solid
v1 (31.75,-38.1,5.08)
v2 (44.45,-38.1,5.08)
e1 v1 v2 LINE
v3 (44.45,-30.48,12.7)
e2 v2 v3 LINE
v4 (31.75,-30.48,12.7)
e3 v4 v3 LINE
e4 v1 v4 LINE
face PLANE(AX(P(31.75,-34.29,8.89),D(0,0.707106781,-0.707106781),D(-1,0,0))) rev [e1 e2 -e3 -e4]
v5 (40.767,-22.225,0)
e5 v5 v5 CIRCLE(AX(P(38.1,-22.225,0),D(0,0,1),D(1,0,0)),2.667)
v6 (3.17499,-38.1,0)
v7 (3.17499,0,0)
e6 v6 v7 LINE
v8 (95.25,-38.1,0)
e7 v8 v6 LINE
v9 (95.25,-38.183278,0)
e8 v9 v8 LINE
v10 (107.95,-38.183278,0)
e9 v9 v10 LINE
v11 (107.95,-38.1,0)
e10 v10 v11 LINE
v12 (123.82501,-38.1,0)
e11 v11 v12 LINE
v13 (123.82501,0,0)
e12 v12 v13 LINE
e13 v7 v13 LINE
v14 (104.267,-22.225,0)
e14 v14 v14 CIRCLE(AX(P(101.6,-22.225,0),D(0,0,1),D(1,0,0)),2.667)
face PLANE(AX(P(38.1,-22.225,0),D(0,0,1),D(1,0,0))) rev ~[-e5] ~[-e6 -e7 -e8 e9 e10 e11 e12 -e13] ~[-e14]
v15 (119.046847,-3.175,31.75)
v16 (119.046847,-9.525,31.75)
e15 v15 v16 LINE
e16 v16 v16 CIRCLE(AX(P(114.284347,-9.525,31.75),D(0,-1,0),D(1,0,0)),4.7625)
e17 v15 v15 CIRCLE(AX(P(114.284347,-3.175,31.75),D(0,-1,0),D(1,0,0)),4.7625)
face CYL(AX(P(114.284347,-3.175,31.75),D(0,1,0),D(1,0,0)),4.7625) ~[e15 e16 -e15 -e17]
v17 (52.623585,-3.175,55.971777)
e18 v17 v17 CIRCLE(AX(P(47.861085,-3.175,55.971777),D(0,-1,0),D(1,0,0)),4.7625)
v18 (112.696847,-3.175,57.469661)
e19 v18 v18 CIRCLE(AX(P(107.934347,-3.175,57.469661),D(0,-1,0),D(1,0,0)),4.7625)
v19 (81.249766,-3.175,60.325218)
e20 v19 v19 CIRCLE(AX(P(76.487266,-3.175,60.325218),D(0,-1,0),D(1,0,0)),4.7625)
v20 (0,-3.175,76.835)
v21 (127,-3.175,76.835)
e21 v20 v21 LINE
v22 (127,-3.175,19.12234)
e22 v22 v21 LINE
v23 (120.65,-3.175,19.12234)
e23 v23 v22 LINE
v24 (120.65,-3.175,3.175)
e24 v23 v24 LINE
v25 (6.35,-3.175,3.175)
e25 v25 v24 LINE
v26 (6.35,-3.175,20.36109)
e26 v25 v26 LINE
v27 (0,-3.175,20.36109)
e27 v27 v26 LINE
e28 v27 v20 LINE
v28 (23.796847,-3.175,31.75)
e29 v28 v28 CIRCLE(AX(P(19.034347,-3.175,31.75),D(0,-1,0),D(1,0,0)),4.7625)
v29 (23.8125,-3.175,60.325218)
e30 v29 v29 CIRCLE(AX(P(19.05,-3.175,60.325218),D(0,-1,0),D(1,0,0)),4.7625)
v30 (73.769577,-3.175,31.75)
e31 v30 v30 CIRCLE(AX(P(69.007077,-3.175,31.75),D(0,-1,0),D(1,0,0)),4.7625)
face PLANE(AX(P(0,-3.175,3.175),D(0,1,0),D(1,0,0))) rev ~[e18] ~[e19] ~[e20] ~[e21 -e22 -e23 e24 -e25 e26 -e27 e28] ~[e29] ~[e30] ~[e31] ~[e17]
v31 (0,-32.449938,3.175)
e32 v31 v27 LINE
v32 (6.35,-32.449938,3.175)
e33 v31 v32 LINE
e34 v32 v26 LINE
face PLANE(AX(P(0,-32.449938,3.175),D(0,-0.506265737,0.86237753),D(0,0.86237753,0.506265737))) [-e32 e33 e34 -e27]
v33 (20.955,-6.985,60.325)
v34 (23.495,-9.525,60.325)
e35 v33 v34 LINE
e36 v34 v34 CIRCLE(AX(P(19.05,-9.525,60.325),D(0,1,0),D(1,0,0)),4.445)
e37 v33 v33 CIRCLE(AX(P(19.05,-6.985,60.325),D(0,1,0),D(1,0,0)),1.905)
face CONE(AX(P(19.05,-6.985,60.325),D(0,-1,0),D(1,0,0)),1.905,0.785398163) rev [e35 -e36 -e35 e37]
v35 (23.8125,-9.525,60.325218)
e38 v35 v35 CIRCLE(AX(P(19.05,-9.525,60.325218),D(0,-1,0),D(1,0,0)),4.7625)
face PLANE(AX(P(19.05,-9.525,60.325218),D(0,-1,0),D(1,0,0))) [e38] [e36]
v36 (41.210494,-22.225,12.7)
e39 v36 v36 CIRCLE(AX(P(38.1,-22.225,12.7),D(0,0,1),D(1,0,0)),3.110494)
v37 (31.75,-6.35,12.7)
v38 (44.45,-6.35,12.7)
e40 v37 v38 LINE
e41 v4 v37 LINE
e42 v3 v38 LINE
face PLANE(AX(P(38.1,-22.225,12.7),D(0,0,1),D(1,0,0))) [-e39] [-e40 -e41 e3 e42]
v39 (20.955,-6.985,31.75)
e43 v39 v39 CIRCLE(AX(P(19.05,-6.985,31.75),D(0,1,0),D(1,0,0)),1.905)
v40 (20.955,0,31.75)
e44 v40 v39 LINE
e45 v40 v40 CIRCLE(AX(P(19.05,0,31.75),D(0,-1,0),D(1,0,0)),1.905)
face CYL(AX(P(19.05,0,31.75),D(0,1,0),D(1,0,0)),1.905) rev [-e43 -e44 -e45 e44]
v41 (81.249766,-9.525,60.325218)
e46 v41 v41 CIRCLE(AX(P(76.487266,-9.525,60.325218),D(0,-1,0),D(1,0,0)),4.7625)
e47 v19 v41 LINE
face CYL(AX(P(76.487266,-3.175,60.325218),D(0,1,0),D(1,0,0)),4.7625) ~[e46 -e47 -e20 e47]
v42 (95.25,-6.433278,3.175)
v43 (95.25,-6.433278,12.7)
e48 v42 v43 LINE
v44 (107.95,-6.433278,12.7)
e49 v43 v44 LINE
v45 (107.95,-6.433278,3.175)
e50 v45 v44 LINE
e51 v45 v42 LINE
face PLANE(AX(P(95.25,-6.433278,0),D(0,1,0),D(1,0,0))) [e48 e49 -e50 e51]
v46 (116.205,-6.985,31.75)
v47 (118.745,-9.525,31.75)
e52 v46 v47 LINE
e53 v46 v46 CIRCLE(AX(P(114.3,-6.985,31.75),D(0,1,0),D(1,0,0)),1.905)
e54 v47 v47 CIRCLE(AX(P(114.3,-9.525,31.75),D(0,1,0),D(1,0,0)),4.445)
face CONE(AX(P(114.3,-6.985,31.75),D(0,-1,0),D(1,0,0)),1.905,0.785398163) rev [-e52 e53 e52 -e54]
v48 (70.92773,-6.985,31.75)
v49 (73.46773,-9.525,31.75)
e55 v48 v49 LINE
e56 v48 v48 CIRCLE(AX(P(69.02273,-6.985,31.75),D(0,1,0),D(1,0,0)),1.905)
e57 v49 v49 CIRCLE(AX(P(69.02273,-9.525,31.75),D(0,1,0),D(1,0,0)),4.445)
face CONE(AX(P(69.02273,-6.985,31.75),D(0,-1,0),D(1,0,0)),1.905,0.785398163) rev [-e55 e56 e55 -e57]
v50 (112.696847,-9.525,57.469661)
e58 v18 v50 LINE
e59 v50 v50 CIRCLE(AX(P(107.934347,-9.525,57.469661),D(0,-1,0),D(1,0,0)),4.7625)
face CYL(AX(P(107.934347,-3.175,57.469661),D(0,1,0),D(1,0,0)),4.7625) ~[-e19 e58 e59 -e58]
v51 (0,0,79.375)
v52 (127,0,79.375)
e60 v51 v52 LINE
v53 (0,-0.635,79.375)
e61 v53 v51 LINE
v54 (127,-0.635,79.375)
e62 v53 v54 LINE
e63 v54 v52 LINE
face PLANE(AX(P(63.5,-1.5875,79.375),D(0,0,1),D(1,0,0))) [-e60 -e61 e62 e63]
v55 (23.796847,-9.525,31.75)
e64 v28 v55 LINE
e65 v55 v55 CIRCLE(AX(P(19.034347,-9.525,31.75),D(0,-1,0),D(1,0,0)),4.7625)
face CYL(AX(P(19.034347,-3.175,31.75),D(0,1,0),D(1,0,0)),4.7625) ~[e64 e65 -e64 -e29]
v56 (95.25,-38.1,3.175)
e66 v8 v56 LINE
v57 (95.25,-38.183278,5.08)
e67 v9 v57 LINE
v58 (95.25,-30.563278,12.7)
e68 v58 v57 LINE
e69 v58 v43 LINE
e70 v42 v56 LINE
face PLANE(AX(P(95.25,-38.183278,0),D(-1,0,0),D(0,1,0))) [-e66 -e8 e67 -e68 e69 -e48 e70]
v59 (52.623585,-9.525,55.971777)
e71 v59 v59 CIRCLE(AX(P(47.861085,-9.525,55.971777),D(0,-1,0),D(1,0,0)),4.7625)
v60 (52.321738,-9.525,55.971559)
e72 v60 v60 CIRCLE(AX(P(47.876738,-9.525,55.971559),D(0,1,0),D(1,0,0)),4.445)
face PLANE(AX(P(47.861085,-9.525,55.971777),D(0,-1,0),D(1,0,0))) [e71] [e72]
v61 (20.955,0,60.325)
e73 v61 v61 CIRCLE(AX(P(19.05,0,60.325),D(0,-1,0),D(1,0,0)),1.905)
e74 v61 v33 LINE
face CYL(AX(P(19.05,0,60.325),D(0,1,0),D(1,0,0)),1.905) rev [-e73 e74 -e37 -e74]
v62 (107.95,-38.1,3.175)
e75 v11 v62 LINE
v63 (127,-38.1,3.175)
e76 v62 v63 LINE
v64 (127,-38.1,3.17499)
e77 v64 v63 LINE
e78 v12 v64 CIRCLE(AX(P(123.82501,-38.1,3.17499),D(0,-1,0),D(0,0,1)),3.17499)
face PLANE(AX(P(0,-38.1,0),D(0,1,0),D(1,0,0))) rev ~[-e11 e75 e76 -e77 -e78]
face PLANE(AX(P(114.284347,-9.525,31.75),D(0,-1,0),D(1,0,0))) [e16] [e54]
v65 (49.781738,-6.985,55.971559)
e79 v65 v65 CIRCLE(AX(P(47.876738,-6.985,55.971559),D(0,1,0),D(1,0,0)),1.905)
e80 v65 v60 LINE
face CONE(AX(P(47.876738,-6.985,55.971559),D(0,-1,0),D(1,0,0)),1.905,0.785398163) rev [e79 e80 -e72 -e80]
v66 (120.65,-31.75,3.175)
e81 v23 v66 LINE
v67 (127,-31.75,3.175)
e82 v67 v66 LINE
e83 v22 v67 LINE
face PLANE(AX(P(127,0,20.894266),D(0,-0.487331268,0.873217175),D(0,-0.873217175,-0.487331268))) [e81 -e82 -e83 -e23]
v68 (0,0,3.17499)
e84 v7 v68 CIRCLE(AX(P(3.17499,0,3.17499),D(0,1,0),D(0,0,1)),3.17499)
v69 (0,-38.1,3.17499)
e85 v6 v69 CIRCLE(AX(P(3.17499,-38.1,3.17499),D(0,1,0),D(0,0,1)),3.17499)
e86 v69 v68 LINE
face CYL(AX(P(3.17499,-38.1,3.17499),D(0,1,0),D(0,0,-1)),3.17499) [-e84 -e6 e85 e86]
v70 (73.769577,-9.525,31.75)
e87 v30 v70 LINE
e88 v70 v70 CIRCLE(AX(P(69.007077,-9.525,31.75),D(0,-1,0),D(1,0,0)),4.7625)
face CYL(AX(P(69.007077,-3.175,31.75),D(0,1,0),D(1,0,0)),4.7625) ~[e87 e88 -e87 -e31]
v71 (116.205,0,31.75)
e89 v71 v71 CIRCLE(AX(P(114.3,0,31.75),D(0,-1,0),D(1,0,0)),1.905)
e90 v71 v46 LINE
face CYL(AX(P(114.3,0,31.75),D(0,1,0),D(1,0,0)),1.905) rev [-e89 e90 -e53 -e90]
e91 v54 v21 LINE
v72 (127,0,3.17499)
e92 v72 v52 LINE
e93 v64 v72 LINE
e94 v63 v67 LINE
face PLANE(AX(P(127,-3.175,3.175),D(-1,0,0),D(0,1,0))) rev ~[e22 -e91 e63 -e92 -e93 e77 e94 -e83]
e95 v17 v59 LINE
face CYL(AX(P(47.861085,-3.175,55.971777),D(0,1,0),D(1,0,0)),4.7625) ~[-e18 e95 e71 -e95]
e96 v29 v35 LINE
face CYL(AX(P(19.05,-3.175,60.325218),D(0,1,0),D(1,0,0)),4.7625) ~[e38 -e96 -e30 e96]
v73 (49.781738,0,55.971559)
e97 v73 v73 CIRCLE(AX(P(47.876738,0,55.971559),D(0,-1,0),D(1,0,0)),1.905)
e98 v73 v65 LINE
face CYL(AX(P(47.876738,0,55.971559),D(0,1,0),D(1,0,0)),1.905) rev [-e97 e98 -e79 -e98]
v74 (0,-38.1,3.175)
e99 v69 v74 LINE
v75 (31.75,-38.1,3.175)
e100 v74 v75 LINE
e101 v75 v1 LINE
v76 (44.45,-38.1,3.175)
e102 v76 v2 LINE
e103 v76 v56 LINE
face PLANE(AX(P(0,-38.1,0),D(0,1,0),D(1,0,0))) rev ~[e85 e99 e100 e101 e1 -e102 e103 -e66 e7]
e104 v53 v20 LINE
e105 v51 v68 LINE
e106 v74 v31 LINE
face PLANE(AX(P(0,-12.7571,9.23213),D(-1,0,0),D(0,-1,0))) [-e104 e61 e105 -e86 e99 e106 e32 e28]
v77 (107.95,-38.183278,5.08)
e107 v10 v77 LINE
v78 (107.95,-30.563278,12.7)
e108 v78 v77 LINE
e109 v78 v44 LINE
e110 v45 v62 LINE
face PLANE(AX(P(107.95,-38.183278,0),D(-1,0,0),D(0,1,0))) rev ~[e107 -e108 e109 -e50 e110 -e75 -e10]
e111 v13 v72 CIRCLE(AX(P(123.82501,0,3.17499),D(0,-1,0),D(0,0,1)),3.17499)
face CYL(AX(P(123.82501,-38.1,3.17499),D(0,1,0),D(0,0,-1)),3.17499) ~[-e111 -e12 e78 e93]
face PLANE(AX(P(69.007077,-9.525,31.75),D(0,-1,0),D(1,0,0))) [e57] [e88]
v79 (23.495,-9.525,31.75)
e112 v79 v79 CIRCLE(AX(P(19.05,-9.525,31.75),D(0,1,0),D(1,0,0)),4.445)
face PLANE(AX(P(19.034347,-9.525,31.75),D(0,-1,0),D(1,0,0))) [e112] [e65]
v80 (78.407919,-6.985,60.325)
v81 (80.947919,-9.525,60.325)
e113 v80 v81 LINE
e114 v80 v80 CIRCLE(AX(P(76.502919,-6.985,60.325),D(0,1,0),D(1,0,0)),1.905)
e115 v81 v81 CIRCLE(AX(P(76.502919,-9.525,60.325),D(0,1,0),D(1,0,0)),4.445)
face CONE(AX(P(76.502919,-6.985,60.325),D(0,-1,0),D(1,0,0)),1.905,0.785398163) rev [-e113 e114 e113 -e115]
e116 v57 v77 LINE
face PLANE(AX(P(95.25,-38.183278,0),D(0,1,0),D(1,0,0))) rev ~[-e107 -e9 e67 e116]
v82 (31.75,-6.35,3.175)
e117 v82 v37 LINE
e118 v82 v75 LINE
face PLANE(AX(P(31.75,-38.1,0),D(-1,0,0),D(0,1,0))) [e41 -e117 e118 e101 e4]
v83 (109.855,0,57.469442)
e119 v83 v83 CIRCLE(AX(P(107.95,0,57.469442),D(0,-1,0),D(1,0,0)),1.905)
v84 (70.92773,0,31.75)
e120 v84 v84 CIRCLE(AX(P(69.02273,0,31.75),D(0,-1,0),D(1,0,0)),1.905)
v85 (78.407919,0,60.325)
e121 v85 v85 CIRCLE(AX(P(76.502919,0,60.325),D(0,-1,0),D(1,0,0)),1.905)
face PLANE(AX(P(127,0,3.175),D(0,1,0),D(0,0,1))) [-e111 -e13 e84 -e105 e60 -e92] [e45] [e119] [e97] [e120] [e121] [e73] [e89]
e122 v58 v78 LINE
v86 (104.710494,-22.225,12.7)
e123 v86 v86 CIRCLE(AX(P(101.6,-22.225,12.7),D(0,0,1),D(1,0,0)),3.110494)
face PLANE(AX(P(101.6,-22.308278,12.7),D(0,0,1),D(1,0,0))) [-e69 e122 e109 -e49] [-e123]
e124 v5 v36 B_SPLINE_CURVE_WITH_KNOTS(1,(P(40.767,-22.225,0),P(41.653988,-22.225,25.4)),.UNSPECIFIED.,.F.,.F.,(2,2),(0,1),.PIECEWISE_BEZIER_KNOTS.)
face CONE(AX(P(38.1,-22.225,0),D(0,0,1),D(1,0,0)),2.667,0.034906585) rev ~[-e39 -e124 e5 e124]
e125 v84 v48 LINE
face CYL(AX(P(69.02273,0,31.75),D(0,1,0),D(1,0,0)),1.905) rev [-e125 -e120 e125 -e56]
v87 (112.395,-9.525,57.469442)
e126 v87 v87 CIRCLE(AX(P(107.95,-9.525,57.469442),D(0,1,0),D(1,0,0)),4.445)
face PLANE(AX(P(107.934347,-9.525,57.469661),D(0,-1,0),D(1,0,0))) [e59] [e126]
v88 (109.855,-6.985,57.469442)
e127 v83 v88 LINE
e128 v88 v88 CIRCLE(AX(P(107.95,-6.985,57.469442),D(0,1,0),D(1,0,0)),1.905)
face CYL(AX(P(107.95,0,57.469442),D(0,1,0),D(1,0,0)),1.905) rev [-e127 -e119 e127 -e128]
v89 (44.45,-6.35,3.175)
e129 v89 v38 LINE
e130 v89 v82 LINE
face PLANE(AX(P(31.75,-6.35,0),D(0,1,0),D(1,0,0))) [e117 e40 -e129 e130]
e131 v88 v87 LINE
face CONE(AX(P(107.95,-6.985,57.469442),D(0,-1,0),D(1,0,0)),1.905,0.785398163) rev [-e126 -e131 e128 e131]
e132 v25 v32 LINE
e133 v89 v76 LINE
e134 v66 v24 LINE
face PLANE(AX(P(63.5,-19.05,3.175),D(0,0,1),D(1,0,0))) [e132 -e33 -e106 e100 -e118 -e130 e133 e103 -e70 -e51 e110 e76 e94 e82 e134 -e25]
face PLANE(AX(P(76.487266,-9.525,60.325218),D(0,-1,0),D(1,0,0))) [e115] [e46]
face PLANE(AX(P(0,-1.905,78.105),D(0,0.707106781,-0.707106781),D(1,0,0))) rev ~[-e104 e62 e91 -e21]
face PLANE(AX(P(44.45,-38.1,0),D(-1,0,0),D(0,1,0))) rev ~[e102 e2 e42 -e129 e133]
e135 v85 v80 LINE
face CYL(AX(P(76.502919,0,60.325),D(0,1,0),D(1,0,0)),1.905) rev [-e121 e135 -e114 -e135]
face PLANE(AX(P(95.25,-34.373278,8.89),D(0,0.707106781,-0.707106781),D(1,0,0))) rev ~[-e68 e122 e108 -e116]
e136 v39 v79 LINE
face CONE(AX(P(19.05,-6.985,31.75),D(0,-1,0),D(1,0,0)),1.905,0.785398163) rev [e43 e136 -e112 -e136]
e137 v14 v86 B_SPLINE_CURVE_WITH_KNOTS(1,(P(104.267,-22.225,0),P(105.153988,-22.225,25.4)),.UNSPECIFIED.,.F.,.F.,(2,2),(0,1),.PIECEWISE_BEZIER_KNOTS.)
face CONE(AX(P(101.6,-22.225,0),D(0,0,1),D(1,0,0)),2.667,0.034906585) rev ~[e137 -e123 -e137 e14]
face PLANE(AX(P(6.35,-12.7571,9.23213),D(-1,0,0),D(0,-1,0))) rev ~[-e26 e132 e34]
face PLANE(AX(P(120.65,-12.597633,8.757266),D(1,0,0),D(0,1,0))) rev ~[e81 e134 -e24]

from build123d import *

# Parameters (mm, degrees)
F1_W      = 127
F1_H      = 38.1
F2_DEPTH  = 3.175
F4_W      = 127
F4_H      = 3.175
F5_DEPTH  = 76.2
F7_W      = 12.7
F7_H      = 31.75
F8_DEPTH  = 12.7
F6_R      = 2.667
F9_DEPTH  = 25.4
F9_TAPER  = -2
F10_R     = 3.17499
F12_DEPTH = 6.35
F14_DEPTH = 6.35
F15_R     = 4.7625
F16_DEPTH = 6.35
F17_R     = 1.905
F18_DEPTH = 25.4
F19_SIZE  = 2.54
F20_SIZE  = 2.54
F21_SIZE  = 7.62


# Not quite as in the source:
# - a fillet or chamfer is up to 0.001 mm smaller than in the source, because OpenCascade refuses the exact size


with BuildPart() as f2:
    # F1 (on Top) → F2 (new body)
    with BuildSketch(Plane.XY):
        with Locations((63.5, -19.05)):
            Rectangle(F1_W, F1_H)
    extrude(amount=F2_DEPTH)

    # F4 (on face) → F5 (join)
    with BuildSketch(Plane.XY.offset(3.175)):
        with Locations((63.5, -1.5875)):
            Rectangle(F4_W, F4_H)
    extrude(amount=F5_DEPTH)

    # F7 (on Top) → F8 (join)
    with BuildSketch(Plane.XY):
        with Locations((38.1, -22.225)):
            Rectangle(F7_W, F7_H)
        with Locations((101.6, -22.3082778975)):
            Rectangle(F7_W, F7_H)
    extrude(amount=F8_DEPTH)

    # F6 (on Top) → F9 (cut)
    with BuildSketch(Plane.XY):
        with Locations((38.1, -22.225)):
            Circle(F6_R)
        with Locations((101.6, -22.225)):
            Circle(F6_R)
    extrude(amount=F9_DEPTH, taper=F9_TAPER, mode=Mode.SUBTRACT)

    # F10 (radius 3.175 in the source; OpenCascade refuses exactly that, so slightly less here)
    f10_edges = [f2.edges().sort_by_distance(p)[0] for p in [
        (0, -19.05, 0),
        (127, -19.05, 0),
    ]]
    fillet(f10_edges, radius=F10_R)

    # F11 (on face) → F12 (join)
    with BuildSketch(Plane(origin=(0, 0, 0), x_dir=(0, -1, 0), z_dir=(-1, 0, 0))):
        Polygon((32.4499383569, 3.175), (0, 22.225), (0, 3.175), align=None)
    extrude(amount=-F12_DEPTH)

    # F13 (on face) → F14 (join)
    with BuildSketch(Plane.YZ.offset(127)):
        Polygon((0, 3.175), (0, 20.8942663938), (-31.75, 3.175), align=None)
    extrude(amount=-F14_DEPTH)

    # F15 (on face) → F16 (join)
    with BuildSketch(Plane.XZ.offset(3.175)):
        with Locations((19.05, 60.3252180792)):
            Circle(F15_R)
        with Locations((47.8610846677, 55.9717772163)):
            Circle(F15_R)
        with Locations((76.4872658529, 60.3252180792)):
            Circle(F15_R)
        with Locations((107.9343466558, 57.469660566)):
            Circle(F15_R)
        with Locations((19.0343466558, 31.75)):
            Circle(F15_R)
        with Locations((69.0070766487, 31.75)):
            Circle(F15_R)
        with Locations((114.2843466558, 31.75)):
            Circle(F15_R)
    extrude(amount=F16_DEPTH)

    # F17 (on Front) → F18 (cut)
    with BuildSketch(Plane.XZ):
        with Locations((19.05, 60.325)):
            Circle(F17_R)
        with Locations((47.8767380118, 55.9715591371)):
            Circle(F17_R)
        with Locations((76.5029191971, 60.325)):
            Circle(F17_R)
        with Locations((107.95, 57.4694424868)):
            Circle(F17_R)
        with Locations((19.05, 31.75)):
            Circle(F17_R)
        with Locations((69.0227299929, 31.75)):
            Circle(F17_R)
        with Locations((114.3, 31.75)):
            Circle(F17_R)
    extrude(amount=F18_DEPTH, mode=Mode.SUBTRACT)

    # F19
    f19_edges = [f2.edges().sort_by_distance(p)[0] for p in [
        (17.145, -9.525, 60.325),
        (45.971738, -9.525, 55.971559),
        (74.597919, -9.525, 60.325),
        (17.145, -9.525, 31.75),
        (106.045, -9.525, 57.469442),
        (112.395, -9.525, 31.75),
        (67.11773, -9.525, 31.75),
    ]]
    chamfer(f19_edges, length=F19_SIZE)

    # F20
    f20_edges = [f2.edges().sort_by_distance(p)[0] for p in [
        (63.5, -3.175, 79.375),
    ]]
    chamfer(f20_edges, length=F20_SIZE)

    # F21
    f21_edges = [f2.edges().sort_by_distance(p)[0] for p in [
        (38.1, -38.1, 12.7),
        (101.6, -38.183278, 12.7),
    ]]
    chamfer(f21_edges, length=F21_SIZE)


solid = f2.part
